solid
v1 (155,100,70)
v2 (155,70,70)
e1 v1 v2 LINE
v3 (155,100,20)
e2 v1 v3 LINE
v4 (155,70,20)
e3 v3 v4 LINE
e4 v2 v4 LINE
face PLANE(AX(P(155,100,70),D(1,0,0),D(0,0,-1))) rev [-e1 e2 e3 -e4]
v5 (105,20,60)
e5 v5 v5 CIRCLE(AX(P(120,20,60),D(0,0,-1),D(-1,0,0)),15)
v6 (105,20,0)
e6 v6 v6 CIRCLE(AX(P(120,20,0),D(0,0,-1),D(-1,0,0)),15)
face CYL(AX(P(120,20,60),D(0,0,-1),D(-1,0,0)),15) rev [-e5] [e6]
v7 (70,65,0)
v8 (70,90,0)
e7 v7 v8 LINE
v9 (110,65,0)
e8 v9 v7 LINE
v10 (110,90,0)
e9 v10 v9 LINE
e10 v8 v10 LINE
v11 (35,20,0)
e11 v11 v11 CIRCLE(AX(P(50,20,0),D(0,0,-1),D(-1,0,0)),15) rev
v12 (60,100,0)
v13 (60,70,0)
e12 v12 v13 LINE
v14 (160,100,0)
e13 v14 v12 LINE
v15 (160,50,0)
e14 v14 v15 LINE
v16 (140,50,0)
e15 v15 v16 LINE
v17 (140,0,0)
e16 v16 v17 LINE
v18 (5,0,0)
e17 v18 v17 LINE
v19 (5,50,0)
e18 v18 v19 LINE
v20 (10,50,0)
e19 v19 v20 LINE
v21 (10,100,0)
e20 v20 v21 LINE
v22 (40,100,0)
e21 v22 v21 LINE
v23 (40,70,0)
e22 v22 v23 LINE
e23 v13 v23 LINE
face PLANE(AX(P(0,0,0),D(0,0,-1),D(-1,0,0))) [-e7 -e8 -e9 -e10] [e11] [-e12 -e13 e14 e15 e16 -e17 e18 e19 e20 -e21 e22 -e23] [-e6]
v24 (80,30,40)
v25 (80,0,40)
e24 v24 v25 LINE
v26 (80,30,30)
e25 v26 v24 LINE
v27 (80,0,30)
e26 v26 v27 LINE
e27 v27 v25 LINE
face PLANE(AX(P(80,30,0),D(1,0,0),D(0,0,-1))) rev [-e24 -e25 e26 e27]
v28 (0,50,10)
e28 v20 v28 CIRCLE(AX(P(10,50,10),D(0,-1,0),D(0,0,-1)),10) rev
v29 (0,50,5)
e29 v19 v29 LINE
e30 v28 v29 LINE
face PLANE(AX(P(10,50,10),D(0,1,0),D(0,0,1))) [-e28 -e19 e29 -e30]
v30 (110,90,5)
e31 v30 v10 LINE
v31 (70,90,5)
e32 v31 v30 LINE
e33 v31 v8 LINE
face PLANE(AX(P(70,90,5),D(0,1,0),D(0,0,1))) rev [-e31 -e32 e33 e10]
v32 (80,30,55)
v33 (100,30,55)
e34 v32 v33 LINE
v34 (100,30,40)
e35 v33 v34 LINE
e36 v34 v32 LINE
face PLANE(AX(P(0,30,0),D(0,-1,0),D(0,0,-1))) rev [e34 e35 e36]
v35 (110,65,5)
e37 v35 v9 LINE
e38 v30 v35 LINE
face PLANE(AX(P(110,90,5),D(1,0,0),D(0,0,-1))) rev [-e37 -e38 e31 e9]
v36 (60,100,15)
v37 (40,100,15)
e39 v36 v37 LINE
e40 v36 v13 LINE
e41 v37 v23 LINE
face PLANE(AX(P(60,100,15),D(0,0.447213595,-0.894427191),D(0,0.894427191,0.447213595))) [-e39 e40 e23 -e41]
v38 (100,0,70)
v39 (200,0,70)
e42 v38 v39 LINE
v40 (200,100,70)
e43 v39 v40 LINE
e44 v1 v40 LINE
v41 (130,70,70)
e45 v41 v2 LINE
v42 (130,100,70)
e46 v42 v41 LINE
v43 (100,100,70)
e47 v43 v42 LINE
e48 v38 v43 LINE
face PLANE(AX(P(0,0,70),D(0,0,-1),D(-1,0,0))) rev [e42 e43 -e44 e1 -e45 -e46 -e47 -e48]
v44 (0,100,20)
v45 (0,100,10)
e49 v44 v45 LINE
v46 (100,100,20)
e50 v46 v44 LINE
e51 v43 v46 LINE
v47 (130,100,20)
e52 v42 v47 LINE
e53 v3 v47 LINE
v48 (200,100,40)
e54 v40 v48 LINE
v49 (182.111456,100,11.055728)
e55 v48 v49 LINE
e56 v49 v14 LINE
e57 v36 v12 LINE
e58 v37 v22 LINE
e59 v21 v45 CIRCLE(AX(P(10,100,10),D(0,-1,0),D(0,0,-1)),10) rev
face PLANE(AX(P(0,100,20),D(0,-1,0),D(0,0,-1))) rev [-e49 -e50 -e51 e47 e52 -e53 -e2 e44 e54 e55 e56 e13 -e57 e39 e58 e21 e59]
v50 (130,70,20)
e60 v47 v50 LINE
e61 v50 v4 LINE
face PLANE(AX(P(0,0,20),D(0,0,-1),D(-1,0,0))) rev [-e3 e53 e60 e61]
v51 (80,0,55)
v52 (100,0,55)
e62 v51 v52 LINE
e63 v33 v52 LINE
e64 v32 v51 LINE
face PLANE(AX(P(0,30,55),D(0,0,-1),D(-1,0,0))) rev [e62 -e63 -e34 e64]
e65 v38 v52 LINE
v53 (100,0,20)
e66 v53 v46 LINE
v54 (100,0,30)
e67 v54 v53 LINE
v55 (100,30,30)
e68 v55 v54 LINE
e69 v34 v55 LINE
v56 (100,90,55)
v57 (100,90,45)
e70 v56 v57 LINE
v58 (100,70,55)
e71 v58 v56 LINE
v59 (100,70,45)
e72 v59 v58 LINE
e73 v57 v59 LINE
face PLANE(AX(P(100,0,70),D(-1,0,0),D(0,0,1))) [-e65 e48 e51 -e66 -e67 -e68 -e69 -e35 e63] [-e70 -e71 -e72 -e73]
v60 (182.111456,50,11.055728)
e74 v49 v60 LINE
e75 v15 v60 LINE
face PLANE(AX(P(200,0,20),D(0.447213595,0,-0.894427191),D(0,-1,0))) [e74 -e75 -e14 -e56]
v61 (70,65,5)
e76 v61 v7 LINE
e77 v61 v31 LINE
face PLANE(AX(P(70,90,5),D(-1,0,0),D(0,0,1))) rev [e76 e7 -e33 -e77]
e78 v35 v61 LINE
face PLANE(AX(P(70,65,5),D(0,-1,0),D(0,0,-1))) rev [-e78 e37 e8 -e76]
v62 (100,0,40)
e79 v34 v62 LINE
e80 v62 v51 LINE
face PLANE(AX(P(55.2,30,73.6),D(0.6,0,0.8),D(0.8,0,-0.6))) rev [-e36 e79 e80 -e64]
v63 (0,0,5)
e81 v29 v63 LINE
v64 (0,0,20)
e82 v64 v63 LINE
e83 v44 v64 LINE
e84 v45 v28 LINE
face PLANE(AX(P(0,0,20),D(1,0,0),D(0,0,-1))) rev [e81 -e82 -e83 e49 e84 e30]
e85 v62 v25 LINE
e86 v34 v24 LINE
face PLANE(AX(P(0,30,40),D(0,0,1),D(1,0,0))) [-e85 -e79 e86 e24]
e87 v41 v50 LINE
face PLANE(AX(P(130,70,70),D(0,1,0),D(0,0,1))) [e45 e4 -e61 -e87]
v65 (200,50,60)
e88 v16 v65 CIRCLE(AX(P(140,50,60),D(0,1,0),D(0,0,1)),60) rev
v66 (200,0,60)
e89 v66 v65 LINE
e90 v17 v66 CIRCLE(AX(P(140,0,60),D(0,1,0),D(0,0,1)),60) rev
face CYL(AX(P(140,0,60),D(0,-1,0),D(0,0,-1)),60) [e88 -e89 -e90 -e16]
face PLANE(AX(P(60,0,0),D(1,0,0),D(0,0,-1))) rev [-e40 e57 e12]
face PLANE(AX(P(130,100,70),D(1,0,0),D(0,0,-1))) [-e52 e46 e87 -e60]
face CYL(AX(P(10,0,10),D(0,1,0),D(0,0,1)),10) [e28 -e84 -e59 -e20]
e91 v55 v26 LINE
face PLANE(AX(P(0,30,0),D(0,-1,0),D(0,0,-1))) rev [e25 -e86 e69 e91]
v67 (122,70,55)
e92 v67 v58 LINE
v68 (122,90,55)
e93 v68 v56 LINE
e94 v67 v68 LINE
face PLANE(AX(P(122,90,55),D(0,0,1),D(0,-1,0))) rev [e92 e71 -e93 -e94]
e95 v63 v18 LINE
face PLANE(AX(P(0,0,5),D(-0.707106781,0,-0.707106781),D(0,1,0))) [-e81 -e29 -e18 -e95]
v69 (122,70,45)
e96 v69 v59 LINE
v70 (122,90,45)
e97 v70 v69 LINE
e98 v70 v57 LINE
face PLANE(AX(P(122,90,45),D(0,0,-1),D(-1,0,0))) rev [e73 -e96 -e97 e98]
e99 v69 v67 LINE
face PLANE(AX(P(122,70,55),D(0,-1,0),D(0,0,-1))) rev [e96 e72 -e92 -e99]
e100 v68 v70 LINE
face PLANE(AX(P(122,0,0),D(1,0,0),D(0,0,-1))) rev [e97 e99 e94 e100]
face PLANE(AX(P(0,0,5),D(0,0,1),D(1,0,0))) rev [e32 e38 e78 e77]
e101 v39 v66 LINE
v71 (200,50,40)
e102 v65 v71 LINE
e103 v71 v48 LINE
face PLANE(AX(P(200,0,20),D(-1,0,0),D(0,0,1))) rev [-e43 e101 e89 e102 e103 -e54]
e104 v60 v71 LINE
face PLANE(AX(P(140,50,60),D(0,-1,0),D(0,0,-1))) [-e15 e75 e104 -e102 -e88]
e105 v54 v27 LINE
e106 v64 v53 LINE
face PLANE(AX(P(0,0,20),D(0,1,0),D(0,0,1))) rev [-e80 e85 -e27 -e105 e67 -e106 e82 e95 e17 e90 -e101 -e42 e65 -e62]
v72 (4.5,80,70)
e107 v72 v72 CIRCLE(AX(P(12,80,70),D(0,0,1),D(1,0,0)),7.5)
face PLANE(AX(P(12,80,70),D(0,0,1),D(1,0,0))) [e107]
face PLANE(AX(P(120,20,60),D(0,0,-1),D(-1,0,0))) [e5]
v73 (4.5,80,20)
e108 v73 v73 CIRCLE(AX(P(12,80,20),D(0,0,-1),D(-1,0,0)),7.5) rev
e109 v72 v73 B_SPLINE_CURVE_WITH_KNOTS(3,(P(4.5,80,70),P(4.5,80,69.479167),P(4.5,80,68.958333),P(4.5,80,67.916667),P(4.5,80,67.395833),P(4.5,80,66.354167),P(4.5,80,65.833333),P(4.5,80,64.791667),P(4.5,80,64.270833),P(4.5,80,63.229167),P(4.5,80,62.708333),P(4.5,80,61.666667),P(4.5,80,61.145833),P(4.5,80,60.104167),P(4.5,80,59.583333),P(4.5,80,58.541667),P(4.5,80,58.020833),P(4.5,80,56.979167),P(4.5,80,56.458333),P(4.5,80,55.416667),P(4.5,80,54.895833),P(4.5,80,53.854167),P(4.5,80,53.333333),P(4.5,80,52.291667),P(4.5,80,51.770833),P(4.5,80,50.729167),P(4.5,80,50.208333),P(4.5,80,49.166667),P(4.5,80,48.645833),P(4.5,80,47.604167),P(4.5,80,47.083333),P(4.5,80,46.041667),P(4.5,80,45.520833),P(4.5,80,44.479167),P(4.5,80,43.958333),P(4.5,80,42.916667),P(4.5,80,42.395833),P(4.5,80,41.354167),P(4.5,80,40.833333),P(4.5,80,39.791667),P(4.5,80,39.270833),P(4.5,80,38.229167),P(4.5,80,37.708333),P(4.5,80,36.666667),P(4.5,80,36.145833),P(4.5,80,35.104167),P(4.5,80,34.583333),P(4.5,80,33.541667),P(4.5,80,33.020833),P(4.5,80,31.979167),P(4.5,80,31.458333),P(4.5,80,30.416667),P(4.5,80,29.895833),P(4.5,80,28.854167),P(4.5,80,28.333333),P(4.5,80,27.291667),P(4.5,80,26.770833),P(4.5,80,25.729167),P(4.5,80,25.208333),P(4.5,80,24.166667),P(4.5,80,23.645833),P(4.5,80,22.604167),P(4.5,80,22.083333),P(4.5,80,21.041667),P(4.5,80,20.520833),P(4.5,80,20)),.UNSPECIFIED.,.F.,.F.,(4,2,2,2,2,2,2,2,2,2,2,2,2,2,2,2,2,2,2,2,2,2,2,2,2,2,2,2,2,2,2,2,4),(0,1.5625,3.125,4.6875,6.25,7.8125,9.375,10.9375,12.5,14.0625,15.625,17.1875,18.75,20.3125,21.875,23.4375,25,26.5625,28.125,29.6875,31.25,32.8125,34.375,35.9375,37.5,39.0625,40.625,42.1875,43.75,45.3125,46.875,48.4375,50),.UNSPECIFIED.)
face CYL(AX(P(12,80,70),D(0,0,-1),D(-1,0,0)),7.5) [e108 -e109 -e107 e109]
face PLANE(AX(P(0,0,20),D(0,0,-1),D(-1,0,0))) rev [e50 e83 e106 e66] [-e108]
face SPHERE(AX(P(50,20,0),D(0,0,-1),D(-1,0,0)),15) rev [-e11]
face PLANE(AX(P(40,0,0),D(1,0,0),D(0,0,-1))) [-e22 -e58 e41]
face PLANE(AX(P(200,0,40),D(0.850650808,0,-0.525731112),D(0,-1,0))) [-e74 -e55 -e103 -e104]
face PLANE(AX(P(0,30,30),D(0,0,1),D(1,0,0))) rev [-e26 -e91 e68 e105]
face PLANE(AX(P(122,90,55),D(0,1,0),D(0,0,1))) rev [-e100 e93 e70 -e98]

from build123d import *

# Parameters (mm, degrees)
SKICA1_W                 = 200
SKICA1_H                 = 100
P_IDAT_VYSUNUT_M1_DEPTH  = 20
P_IDAT_VYSUNUT_M2_DEPTH  = 50
SKICA7_R                 = 7.5
P_IDAT_VYSUNUT_M3_DEPTH  = 50
ODEBRAT_VYSUNUT_M3_DEPTH = 10
ZAOBLIT1_START           = 50
ZAOBLIT1_DEPTH           = 51
SKICA9_W                 = 40
SKICA9_H                 = 25
ODEBRAT_VYSUNUT_M4_DEPTH = 5
CHAMFER2_SIZE            = 5
FILLET2_DEPTH            = 50
CHAMFER3_SIZE            = 40
CHAMFER3_SIZE2           = 20
CHAMFER4_SIZE            = 20
SKETCH3_R                = 15
CUT_EXTRUDE2_DEPTH       = 60
SKETCH4_W                = 10
SKETCH4_H                = 20
CUT_EXTRUDE3_DEPTH       = 22
SKETCH5_W                = 20
SKETCH5_H                = 10
BOSS_EXTRUDE1_DEPTH      = 30


with BuildPart() as part:
    # Skica1 → Přidat vysunutím1 (new body)
    with BuildSketch(Plane.XY):
        with Locations((100, 50)):
            Rectangle(SKICA1_W, SKICA1_H)
    extrude(amount=P_IDAT_VYSUNUT_M1_DEPTH)

    # Skica2 → Přidat vysunutím2 (add)
    with BuildSketch(Plane.XY.offset(20)):
        Polygon((100, 0), (200, 0), (200, 100), (155, 100), (155, 70), (130, 70), (130, 100), (100, 100), align=None)
    extrude(amount=P_IDAT_VYSUNUT_M2_DEPTH)

    # Skica7 → Přidat vysunutím3 (add)
    with BuildSketch(Plane.XY.offset(20)):
        with Locations(Location((12, 80, 0), (0, 0, 180))):
            Circle(SKICA7_R)
    extrude(amount=P_IDAT_VYSUNUT_M3_DEPTH)

    # Skica8 → Odebrat vysunutím3 (cut, symmetric)
    with BuildSketch(Plane.ZY.offset(-50)):
        Polygon((0, 100), (0, 70), (15, 100), align=None)
    extrude(amount=ODEBRAT_VYSUNUT_M3_DEPTH, both=True, mode=Mode.SUBTRACT)

    # Zaoblit1: read off the stored shape, not the designer's step
    # Zaoblit1 outline → Zaoblit1 (cut)
    with BuildSketch(Plane(origin=(0, 0, 0), x_dir=(1, 0, 0), z_dir=(0, 1, 0)).offset(ZAOBLIT1_START)):
        with BuildLine():
            ThreePointArc((0, -10), (2.928932188, -2.928932188), (10, 0))
            Line((10, 0), (0, 0))
            Line((0, 0), (0, -10))
        make_face()
    extrude(amount=ZAOBLIT1_DEPTH, mode=Mode.SUBTRACT)

    # Skica9 → Odebrat vysunutím4 (cut)
    with BuildSketch(Plane(origin=(0, 0, 0), x_dir=(-1, 0, 0), z_dir=(0, 0, -1))):
        with Locations((-90, 77.5)):
            Rectangle(SKICA9_W, SKICA9_H)
    extrude(amount=-ODEBRAT_VYSUNUT_M4_DEPTH, mode=Mode.SUBTRACT)

    # Chamfer2
    chamfer2_edges = [part.edges().sort_by_distance(p)[0] for p in [
        (0, 25, 0),
    ]]
    chamfer(chamfer2_edges, length=CHAMFER2_SIZE)

    # Fillet2: read off the stored shape, not the designer's step
    # Fillet2 outline → Fillet2 (cut)
    with BuildSketch(Plane(origin=(0, 0, 0), x_dir=(1, 0, 0), z_dir=(0, 1, 0))):
        with BuildLine():
            Line((200, 0), (140, 0))
            ThreePointArc((140, 0), (182.426406871, -17.573593129), (200, -60))
            Line((200, -60), (200, 0))
        make_face()
    extrude(amount=FILLET2_DEPTH, mode=Mode.SUBTRACT)

    # Chamfer3
    chamfer3_edges = [part.edges().sort_by_distance(p)[0] for p in [
        (200, 75, 0),
    ]]
    chamfer3_side = [part.faces().sort_by_distance(p)[0] for p in [
        (93.302047782, 51.38225256, 0),
    ]]
    chamfer(chamfer3_edges, length=CHAMFER3_SIZE, length2=CHAMFER3_SIZE2, reference=chamfer3_side[0])

    # Chamfer4
    chamfer4_edges = [part.edges().sort_by_distance(p)[0] for p in [
        (200, 75, 20),
    ]]
    chamfer(chamfer4_edges, length=CHAMFER4_SIZE)

    # Sketch2 → Cut-Revolve4 (revolve, cut)
    with BuildSketch(Plane(origin=(0, 0, 0), x_dir=(-1, 0, 0), z_dir=(0, 0, -1))):
        with BuildLine():
            Line((-50, 35), (-50, 5))
            ThreePointArc((-50, 5), (-35, 20), (-50, 35))
        make_face()
    revolve(axis=Axis((50, 35, 0), (0, -1, 0)), mode=Mode.SUBTRACT)

    # Sketch3 → Cut-Extrude2 (cut)
    with BuildSketch(Plane(origin=(0, 0, 0), x_dir=(-1, 0, 0), z_dir=(0, 0, -1))):
        with Locations((-120, 20)):
            Circle(SKETCH3_R)
    extrude(amount=-CUT_EXTRUDE2_DEPTH, mode=Mode.SUBTRACT)

    # Sketch4 → Cut-Extrude3 (cut)
    with BuildSketch(Plane.ZY.offset(-100)):
        with Locations((50, 80)):
            Rectangle(SKETCH4_W, SKETCH4_H)
    extrude(amount=-CUT_EXTRUDE3_DEPTH, mode=Mode.SUBTRACT)

    # Sketch5 → Boss-Extrude1 (add)
    with BuildSketch(Plane.XZ):
        Polygon((80, 55), (100, 40), (100, 55), align=None)
        with Locations((90, 35)):
            Rectangle(SKETCH5_W, SKETCH5_H)
    extrude(amount=-BOSS_EXTRUDE1_DEPTH)


solid = part.part
